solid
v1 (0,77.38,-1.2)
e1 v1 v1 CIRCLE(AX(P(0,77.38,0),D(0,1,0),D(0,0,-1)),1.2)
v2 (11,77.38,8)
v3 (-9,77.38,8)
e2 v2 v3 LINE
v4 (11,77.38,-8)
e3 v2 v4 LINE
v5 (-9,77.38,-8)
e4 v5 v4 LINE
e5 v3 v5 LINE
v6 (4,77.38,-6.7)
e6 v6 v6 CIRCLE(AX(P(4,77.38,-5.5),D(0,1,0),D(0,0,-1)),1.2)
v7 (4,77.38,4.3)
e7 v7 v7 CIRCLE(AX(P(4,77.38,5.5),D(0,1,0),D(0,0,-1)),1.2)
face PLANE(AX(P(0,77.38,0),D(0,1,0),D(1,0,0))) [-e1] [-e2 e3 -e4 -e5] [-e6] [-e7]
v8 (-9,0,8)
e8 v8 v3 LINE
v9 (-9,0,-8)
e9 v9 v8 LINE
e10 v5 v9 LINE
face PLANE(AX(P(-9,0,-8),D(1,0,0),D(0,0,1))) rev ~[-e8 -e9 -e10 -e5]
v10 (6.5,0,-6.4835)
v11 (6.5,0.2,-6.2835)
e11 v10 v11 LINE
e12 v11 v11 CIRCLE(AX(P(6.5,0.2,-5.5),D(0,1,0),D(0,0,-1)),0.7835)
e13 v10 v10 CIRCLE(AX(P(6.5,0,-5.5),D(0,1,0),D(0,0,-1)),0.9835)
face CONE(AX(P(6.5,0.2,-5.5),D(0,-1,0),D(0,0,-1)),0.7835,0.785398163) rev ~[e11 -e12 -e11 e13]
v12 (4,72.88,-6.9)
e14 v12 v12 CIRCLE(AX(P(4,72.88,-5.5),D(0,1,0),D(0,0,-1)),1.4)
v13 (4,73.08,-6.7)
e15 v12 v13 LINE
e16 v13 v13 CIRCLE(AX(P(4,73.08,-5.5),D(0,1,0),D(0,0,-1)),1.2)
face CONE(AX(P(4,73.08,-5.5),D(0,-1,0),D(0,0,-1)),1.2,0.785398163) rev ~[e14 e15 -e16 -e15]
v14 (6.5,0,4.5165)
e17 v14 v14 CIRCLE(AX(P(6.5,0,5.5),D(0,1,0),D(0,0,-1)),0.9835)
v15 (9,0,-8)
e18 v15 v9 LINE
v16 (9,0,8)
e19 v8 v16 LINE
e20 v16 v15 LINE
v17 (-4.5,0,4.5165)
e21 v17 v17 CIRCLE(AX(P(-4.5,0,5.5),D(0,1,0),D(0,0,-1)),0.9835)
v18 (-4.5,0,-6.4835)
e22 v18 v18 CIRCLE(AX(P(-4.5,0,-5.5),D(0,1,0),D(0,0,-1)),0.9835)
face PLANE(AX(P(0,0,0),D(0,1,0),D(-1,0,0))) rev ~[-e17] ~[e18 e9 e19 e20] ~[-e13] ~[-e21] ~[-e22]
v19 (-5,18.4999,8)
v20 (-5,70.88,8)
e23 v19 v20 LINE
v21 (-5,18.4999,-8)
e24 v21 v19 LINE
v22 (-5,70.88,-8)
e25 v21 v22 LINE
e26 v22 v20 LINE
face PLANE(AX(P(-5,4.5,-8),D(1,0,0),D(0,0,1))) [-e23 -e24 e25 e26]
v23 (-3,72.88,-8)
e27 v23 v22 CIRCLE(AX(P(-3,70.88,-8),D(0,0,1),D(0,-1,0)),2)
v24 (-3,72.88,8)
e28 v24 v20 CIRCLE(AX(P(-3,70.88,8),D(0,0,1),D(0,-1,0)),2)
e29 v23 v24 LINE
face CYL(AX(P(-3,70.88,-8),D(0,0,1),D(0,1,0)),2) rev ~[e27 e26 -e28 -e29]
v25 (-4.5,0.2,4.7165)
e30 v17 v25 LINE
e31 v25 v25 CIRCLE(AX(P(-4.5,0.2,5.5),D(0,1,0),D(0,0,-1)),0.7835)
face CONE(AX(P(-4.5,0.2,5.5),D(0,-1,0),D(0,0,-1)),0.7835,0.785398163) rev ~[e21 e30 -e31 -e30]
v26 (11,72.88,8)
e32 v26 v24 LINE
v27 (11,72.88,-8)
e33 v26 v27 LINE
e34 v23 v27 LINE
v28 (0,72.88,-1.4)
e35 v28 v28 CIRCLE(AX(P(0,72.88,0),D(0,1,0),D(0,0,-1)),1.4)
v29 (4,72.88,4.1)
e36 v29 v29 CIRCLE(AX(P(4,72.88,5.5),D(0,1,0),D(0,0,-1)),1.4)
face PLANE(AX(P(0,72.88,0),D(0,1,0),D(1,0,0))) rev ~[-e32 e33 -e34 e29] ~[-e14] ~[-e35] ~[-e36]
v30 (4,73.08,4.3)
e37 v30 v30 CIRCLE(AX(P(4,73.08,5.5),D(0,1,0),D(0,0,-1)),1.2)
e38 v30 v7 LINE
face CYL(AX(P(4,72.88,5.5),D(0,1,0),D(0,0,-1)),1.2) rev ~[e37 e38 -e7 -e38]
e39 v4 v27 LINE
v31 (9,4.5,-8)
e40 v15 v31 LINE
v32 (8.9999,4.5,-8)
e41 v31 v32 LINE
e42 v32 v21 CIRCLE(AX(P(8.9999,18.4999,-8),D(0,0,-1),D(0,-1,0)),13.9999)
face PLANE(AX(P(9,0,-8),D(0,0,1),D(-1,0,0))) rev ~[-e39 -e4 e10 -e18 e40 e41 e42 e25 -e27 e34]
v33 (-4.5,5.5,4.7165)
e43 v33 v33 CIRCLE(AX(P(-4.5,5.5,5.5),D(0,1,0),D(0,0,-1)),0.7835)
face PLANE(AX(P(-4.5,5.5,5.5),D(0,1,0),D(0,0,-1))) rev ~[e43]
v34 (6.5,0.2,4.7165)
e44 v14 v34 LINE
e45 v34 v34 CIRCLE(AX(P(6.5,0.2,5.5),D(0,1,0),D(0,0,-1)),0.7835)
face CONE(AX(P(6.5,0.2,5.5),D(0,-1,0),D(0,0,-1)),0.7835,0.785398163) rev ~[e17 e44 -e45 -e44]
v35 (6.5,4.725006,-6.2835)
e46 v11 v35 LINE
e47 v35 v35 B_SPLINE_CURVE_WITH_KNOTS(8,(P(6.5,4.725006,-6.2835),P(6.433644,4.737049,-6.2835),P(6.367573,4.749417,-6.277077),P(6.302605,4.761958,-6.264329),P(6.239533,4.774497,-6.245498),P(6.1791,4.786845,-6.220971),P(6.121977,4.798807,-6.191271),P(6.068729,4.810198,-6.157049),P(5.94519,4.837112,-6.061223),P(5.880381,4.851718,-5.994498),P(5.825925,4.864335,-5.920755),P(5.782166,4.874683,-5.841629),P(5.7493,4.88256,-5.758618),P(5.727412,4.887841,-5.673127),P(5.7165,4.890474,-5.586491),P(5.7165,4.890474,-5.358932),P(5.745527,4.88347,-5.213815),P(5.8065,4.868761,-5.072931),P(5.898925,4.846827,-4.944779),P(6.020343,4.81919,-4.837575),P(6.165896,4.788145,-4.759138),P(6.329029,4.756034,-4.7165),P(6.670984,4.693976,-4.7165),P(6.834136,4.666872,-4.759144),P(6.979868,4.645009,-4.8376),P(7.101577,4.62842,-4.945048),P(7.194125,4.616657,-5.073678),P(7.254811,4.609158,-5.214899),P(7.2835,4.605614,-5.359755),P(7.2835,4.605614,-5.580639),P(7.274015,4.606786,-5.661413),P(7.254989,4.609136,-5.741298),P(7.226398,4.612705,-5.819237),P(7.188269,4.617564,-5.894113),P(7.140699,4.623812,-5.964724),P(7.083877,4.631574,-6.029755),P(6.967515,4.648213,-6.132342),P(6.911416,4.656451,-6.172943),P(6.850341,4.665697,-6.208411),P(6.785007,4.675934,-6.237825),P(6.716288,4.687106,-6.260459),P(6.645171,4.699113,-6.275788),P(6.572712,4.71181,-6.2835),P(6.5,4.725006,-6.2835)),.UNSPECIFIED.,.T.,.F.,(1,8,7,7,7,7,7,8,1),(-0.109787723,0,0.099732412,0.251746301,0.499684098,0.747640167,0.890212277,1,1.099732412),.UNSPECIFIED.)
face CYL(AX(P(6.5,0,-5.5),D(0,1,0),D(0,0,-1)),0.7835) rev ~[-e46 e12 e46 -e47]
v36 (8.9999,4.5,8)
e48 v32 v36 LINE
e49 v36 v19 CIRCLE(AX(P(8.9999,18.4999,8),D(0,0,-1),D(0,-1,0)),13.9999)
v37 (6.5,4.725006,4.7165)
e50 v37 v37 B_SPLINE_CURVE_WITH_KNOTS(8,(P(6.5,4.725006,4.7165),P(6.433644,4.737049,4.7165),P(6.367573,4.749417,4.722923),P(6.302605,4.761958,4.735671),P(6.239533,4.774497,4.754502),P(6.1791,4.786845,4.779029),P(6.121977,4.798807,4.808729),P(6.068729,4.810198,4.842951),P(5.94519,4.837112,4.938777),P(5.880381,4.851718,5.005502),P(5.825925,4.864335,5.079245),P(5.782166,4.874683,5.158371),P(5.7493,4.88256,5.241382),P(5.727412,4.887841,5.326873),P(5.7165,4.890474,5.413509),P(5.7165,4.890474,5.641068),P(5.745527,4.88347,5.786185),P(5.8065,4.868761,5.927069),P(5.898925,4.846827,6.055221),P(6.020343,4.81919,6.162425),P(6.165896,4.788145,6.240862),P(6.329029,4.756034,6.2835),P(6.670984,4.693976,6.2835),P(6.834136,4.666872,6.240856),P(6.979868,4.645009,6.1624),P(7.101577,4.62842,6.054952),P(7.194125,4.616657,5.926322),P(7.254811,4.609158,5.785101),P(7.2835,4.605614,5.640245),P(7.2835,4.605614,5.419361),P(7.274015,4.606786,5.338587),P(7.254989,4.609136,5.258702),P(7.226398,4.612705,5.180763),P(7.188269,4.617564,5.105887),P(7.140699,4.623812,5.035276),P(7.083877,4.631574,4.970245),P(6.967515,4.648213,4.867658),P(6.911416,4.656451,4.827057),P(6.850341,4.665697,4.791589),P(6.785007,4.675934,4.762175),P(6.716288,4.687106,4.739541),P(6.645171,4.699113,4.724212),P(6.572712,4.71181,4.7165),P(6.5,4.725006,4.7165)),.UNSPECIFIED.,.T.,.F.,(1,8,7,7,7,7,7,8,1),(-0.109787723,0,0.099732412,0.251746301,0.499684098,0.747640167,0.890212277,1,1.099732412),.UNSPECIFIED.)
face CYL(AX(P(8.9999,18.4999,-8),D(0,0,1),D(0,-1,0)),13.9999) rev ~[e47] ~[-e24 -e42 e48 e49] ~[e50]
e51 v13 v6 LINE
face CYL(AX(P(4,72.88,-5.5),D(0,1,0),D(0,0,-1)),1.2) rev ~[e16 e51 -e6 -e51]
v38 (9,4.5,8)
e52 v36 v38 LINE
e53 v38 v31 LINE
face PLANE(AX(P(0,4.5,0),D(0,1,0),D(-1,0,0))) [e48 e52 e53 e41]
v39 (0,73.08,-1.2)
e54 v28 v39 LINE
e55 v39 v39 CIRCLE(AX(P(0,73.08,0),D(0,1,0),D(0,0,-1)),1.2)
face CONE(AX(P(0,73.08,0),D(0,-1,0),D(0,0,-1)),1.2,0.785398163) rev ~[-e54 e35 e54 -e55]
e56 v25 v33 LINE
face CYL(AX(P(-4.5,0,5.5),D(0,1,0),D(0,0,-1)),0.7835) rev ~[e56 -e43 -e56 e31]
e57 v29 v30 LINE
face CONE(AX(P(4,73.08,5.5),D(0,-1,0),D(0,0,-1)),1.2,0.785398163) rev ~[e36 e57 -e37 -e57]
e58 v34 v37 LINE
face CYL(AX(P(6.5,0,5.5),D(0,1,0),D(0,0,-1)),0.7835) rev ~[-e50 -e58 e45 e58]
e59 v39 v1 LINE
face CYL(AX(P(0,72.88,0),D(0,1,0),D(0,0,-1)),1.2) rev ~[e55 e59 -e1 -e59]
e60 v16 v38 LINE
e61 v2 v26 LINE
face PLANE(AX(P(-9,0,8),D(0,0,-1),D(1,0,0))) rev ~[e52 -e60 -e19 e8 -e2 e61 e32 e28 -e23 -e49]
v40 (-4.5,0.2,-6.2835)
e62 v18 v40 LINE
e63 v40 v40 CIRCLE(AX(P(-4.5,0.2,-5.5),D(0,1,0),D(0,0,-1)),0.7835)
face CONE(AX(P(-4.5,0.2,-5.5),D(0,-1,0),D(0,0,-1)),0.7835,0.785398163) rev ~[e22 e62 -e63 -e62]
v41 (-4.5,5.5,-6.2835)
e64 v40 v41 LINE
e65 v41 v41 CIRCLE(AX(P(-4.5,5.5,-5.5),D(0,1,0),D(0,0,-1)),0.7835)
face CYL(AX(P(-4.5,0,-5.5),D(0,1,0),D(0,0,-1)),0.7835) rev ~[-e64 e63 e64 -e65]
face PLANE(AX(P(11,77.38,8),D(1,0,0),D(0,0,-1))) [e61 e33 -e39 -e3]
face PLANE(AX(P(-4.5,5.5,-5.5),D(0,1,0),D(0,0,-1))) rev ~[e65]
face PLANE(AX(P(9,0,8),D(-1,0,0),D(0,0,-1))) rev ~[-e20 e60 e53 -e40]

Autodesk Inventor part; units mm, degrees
ref_plane "YZ Plane" through (0, 0, 0) normal (1, 0, 0) x (0, 1, 0)
ref_plane "XZ Plane" through (0, 0, 0) normal (0, 1, 0) x (-1, 0, 0)
sketch "Sketch1" plane through (0, 0, 0) normal (0, 1, 0) x (-1, 0, 0)
  line L0 (9, 8) -> (-9, 8)
  line L1 (-9, 8) -> (-9, -8)
  line L2 (-9, -8) -> (9, -8)
  line L3 (9, -8) -> (9, 8)
  line L4 (9, 8) -> (-9, -8) construction
  line L5 (-9, 8) -> (9, -8) construction
  point P0 (0, 0)
  dimension "d0" = 18
  dimension "d1" = 16
extrude "Extrusion1" add sketch "Sketch1" along normal blind 4.5
ref_plane "Work Plane1" through (-12, 77.38, -8) normal (0, -1, 0) x (1, 0, 0)
sketch "Sketch6" plane through (0, 4.5, 0) normal (0, 1, 0) x (1, 0, 0)
  line L0 (9, 8) -> (-9, 8) projected
  line L1 (-9, -8) -> (9, -8) projected
  line L2 (-9, 8) -> (-5, 8)
  line L3 (-5, 8) -> (-5, -8)
  line L4 (-5, -8) -> (-9, -8)
  line L5 (-9, -8) -> (-9, 8)
  line L6 (9, -8) -> (9, 8) projected
  point P0 (0, 0)
  dimension "d27" = 14
extrude "WAZNE" add sketch "Sketch6" along normal up to surface (72.88 mm away) contours L3 L1 L5 L0
fillet "Fillet2" radius 14 1 edges at (-5, 4.5, 0)
sketch "Sketch7" plane through (0, 0, 0) normal (0, -1, 0) x (1, 0, 0)
  line L0 (-4.5, 5.5) -> (6.5, 5.5) construction
  line L1 (6.5, 5.5) -> (6.5, -5.5) construction
  line L2 (6.5, -5.5) -> (-4.5, -5.5) construction
  line L3 (-4.5, -5.5) -> (-4.5, 5.5) construction
  line L4 (9, 8) -> (9, -8) projected
  line L5 (-9, 8) -> (9, 8) projected
  point P0 (0, 0)
  dimension "d31" = 11
  dimension "d32" = 11
  dimension "d33" = 2.5
  dimension "d34" = 2.5
hole "Hole2" at (6.5, 0, 5.5) at (-4.5, 0, 5.5) at (-4.5, 0, -5.5) at (6.5, 0, -5.5) direction (0, 1, 0) diameter 1.567 depth 5.5 thread size "M2x0.4" class "6H" standard "ISO Metric profile"
chamfer "Chamfer2" distance 0.2 angle 45 4 edges at (-4.5, 0, 6.2835) (6.5, 0, 6.2835) (6.5, 0, -4.7165) (-4.5, 0, -4.7165)
sketch "Sketch8" plane through (0, 77.38, 0) normal (0, 1, 0) x (1, 0, 0)
  line L0 (-9, 8) -> (-9, -8) projected
  line L1 (11, -8) -> (11, 8)
  line L2 (-9, 8) -> (11, 8)
  line L3 (11, 8) -> (11, -8)
  line L4 (11, -8) -> (-9, -8)
  line L5 (-9, -8) -> (-9, 8)
  point P0 (0, 0)
  point P1 (11, 8)
  dimension "d63" = 20
extrude "Extrusion6" add sketch "Sketch8" against normal blind 4.5
sketch "Sketch9" plane through (0, 72.88, 0) normal (0, -1, 0) x (1, 0, 0)
  line L0 (11, 8) -> (11, -8) projected
  line L1 (-5, -8) -> (-5, 8) projected
  line L2 (4, 7.0265) -> (4, -6.0756) construction
  point P0 (0, 0)
  point P1 (0, 0)
  point P2 (4, 5.5)
  point P3 (4, -5.5)
  dimension "d52" = 5
  dimension "d67" = 7
  dimension "d68" = 4
  dimension "d69" = 11
  dimension "d70" = 5.5
hole "Hole3" at (0, 72.88, 0) at (4, 72.88, 5.5) at (4, 72.88, -5.5) direction (0, 1, 0) diameter 2.4 end through all clearance for "Countersunk Flat Head Screw ISO 2009/7046" size "M2" standard "ISO"
chamfer "Chamfer3" distance 0.2 angle 45 3 edges at (0, 72.88, 1.2) (4, 72.88, 6.7) (4, 72.88, -4.3)
fillet "Fillet4" radius 2 1 edges at (-5, 72.88, 0)
equation "\"d70\" = 0.5 * d69"
properties part number "KN-00-02-09" material "X5CrNi18-10"
